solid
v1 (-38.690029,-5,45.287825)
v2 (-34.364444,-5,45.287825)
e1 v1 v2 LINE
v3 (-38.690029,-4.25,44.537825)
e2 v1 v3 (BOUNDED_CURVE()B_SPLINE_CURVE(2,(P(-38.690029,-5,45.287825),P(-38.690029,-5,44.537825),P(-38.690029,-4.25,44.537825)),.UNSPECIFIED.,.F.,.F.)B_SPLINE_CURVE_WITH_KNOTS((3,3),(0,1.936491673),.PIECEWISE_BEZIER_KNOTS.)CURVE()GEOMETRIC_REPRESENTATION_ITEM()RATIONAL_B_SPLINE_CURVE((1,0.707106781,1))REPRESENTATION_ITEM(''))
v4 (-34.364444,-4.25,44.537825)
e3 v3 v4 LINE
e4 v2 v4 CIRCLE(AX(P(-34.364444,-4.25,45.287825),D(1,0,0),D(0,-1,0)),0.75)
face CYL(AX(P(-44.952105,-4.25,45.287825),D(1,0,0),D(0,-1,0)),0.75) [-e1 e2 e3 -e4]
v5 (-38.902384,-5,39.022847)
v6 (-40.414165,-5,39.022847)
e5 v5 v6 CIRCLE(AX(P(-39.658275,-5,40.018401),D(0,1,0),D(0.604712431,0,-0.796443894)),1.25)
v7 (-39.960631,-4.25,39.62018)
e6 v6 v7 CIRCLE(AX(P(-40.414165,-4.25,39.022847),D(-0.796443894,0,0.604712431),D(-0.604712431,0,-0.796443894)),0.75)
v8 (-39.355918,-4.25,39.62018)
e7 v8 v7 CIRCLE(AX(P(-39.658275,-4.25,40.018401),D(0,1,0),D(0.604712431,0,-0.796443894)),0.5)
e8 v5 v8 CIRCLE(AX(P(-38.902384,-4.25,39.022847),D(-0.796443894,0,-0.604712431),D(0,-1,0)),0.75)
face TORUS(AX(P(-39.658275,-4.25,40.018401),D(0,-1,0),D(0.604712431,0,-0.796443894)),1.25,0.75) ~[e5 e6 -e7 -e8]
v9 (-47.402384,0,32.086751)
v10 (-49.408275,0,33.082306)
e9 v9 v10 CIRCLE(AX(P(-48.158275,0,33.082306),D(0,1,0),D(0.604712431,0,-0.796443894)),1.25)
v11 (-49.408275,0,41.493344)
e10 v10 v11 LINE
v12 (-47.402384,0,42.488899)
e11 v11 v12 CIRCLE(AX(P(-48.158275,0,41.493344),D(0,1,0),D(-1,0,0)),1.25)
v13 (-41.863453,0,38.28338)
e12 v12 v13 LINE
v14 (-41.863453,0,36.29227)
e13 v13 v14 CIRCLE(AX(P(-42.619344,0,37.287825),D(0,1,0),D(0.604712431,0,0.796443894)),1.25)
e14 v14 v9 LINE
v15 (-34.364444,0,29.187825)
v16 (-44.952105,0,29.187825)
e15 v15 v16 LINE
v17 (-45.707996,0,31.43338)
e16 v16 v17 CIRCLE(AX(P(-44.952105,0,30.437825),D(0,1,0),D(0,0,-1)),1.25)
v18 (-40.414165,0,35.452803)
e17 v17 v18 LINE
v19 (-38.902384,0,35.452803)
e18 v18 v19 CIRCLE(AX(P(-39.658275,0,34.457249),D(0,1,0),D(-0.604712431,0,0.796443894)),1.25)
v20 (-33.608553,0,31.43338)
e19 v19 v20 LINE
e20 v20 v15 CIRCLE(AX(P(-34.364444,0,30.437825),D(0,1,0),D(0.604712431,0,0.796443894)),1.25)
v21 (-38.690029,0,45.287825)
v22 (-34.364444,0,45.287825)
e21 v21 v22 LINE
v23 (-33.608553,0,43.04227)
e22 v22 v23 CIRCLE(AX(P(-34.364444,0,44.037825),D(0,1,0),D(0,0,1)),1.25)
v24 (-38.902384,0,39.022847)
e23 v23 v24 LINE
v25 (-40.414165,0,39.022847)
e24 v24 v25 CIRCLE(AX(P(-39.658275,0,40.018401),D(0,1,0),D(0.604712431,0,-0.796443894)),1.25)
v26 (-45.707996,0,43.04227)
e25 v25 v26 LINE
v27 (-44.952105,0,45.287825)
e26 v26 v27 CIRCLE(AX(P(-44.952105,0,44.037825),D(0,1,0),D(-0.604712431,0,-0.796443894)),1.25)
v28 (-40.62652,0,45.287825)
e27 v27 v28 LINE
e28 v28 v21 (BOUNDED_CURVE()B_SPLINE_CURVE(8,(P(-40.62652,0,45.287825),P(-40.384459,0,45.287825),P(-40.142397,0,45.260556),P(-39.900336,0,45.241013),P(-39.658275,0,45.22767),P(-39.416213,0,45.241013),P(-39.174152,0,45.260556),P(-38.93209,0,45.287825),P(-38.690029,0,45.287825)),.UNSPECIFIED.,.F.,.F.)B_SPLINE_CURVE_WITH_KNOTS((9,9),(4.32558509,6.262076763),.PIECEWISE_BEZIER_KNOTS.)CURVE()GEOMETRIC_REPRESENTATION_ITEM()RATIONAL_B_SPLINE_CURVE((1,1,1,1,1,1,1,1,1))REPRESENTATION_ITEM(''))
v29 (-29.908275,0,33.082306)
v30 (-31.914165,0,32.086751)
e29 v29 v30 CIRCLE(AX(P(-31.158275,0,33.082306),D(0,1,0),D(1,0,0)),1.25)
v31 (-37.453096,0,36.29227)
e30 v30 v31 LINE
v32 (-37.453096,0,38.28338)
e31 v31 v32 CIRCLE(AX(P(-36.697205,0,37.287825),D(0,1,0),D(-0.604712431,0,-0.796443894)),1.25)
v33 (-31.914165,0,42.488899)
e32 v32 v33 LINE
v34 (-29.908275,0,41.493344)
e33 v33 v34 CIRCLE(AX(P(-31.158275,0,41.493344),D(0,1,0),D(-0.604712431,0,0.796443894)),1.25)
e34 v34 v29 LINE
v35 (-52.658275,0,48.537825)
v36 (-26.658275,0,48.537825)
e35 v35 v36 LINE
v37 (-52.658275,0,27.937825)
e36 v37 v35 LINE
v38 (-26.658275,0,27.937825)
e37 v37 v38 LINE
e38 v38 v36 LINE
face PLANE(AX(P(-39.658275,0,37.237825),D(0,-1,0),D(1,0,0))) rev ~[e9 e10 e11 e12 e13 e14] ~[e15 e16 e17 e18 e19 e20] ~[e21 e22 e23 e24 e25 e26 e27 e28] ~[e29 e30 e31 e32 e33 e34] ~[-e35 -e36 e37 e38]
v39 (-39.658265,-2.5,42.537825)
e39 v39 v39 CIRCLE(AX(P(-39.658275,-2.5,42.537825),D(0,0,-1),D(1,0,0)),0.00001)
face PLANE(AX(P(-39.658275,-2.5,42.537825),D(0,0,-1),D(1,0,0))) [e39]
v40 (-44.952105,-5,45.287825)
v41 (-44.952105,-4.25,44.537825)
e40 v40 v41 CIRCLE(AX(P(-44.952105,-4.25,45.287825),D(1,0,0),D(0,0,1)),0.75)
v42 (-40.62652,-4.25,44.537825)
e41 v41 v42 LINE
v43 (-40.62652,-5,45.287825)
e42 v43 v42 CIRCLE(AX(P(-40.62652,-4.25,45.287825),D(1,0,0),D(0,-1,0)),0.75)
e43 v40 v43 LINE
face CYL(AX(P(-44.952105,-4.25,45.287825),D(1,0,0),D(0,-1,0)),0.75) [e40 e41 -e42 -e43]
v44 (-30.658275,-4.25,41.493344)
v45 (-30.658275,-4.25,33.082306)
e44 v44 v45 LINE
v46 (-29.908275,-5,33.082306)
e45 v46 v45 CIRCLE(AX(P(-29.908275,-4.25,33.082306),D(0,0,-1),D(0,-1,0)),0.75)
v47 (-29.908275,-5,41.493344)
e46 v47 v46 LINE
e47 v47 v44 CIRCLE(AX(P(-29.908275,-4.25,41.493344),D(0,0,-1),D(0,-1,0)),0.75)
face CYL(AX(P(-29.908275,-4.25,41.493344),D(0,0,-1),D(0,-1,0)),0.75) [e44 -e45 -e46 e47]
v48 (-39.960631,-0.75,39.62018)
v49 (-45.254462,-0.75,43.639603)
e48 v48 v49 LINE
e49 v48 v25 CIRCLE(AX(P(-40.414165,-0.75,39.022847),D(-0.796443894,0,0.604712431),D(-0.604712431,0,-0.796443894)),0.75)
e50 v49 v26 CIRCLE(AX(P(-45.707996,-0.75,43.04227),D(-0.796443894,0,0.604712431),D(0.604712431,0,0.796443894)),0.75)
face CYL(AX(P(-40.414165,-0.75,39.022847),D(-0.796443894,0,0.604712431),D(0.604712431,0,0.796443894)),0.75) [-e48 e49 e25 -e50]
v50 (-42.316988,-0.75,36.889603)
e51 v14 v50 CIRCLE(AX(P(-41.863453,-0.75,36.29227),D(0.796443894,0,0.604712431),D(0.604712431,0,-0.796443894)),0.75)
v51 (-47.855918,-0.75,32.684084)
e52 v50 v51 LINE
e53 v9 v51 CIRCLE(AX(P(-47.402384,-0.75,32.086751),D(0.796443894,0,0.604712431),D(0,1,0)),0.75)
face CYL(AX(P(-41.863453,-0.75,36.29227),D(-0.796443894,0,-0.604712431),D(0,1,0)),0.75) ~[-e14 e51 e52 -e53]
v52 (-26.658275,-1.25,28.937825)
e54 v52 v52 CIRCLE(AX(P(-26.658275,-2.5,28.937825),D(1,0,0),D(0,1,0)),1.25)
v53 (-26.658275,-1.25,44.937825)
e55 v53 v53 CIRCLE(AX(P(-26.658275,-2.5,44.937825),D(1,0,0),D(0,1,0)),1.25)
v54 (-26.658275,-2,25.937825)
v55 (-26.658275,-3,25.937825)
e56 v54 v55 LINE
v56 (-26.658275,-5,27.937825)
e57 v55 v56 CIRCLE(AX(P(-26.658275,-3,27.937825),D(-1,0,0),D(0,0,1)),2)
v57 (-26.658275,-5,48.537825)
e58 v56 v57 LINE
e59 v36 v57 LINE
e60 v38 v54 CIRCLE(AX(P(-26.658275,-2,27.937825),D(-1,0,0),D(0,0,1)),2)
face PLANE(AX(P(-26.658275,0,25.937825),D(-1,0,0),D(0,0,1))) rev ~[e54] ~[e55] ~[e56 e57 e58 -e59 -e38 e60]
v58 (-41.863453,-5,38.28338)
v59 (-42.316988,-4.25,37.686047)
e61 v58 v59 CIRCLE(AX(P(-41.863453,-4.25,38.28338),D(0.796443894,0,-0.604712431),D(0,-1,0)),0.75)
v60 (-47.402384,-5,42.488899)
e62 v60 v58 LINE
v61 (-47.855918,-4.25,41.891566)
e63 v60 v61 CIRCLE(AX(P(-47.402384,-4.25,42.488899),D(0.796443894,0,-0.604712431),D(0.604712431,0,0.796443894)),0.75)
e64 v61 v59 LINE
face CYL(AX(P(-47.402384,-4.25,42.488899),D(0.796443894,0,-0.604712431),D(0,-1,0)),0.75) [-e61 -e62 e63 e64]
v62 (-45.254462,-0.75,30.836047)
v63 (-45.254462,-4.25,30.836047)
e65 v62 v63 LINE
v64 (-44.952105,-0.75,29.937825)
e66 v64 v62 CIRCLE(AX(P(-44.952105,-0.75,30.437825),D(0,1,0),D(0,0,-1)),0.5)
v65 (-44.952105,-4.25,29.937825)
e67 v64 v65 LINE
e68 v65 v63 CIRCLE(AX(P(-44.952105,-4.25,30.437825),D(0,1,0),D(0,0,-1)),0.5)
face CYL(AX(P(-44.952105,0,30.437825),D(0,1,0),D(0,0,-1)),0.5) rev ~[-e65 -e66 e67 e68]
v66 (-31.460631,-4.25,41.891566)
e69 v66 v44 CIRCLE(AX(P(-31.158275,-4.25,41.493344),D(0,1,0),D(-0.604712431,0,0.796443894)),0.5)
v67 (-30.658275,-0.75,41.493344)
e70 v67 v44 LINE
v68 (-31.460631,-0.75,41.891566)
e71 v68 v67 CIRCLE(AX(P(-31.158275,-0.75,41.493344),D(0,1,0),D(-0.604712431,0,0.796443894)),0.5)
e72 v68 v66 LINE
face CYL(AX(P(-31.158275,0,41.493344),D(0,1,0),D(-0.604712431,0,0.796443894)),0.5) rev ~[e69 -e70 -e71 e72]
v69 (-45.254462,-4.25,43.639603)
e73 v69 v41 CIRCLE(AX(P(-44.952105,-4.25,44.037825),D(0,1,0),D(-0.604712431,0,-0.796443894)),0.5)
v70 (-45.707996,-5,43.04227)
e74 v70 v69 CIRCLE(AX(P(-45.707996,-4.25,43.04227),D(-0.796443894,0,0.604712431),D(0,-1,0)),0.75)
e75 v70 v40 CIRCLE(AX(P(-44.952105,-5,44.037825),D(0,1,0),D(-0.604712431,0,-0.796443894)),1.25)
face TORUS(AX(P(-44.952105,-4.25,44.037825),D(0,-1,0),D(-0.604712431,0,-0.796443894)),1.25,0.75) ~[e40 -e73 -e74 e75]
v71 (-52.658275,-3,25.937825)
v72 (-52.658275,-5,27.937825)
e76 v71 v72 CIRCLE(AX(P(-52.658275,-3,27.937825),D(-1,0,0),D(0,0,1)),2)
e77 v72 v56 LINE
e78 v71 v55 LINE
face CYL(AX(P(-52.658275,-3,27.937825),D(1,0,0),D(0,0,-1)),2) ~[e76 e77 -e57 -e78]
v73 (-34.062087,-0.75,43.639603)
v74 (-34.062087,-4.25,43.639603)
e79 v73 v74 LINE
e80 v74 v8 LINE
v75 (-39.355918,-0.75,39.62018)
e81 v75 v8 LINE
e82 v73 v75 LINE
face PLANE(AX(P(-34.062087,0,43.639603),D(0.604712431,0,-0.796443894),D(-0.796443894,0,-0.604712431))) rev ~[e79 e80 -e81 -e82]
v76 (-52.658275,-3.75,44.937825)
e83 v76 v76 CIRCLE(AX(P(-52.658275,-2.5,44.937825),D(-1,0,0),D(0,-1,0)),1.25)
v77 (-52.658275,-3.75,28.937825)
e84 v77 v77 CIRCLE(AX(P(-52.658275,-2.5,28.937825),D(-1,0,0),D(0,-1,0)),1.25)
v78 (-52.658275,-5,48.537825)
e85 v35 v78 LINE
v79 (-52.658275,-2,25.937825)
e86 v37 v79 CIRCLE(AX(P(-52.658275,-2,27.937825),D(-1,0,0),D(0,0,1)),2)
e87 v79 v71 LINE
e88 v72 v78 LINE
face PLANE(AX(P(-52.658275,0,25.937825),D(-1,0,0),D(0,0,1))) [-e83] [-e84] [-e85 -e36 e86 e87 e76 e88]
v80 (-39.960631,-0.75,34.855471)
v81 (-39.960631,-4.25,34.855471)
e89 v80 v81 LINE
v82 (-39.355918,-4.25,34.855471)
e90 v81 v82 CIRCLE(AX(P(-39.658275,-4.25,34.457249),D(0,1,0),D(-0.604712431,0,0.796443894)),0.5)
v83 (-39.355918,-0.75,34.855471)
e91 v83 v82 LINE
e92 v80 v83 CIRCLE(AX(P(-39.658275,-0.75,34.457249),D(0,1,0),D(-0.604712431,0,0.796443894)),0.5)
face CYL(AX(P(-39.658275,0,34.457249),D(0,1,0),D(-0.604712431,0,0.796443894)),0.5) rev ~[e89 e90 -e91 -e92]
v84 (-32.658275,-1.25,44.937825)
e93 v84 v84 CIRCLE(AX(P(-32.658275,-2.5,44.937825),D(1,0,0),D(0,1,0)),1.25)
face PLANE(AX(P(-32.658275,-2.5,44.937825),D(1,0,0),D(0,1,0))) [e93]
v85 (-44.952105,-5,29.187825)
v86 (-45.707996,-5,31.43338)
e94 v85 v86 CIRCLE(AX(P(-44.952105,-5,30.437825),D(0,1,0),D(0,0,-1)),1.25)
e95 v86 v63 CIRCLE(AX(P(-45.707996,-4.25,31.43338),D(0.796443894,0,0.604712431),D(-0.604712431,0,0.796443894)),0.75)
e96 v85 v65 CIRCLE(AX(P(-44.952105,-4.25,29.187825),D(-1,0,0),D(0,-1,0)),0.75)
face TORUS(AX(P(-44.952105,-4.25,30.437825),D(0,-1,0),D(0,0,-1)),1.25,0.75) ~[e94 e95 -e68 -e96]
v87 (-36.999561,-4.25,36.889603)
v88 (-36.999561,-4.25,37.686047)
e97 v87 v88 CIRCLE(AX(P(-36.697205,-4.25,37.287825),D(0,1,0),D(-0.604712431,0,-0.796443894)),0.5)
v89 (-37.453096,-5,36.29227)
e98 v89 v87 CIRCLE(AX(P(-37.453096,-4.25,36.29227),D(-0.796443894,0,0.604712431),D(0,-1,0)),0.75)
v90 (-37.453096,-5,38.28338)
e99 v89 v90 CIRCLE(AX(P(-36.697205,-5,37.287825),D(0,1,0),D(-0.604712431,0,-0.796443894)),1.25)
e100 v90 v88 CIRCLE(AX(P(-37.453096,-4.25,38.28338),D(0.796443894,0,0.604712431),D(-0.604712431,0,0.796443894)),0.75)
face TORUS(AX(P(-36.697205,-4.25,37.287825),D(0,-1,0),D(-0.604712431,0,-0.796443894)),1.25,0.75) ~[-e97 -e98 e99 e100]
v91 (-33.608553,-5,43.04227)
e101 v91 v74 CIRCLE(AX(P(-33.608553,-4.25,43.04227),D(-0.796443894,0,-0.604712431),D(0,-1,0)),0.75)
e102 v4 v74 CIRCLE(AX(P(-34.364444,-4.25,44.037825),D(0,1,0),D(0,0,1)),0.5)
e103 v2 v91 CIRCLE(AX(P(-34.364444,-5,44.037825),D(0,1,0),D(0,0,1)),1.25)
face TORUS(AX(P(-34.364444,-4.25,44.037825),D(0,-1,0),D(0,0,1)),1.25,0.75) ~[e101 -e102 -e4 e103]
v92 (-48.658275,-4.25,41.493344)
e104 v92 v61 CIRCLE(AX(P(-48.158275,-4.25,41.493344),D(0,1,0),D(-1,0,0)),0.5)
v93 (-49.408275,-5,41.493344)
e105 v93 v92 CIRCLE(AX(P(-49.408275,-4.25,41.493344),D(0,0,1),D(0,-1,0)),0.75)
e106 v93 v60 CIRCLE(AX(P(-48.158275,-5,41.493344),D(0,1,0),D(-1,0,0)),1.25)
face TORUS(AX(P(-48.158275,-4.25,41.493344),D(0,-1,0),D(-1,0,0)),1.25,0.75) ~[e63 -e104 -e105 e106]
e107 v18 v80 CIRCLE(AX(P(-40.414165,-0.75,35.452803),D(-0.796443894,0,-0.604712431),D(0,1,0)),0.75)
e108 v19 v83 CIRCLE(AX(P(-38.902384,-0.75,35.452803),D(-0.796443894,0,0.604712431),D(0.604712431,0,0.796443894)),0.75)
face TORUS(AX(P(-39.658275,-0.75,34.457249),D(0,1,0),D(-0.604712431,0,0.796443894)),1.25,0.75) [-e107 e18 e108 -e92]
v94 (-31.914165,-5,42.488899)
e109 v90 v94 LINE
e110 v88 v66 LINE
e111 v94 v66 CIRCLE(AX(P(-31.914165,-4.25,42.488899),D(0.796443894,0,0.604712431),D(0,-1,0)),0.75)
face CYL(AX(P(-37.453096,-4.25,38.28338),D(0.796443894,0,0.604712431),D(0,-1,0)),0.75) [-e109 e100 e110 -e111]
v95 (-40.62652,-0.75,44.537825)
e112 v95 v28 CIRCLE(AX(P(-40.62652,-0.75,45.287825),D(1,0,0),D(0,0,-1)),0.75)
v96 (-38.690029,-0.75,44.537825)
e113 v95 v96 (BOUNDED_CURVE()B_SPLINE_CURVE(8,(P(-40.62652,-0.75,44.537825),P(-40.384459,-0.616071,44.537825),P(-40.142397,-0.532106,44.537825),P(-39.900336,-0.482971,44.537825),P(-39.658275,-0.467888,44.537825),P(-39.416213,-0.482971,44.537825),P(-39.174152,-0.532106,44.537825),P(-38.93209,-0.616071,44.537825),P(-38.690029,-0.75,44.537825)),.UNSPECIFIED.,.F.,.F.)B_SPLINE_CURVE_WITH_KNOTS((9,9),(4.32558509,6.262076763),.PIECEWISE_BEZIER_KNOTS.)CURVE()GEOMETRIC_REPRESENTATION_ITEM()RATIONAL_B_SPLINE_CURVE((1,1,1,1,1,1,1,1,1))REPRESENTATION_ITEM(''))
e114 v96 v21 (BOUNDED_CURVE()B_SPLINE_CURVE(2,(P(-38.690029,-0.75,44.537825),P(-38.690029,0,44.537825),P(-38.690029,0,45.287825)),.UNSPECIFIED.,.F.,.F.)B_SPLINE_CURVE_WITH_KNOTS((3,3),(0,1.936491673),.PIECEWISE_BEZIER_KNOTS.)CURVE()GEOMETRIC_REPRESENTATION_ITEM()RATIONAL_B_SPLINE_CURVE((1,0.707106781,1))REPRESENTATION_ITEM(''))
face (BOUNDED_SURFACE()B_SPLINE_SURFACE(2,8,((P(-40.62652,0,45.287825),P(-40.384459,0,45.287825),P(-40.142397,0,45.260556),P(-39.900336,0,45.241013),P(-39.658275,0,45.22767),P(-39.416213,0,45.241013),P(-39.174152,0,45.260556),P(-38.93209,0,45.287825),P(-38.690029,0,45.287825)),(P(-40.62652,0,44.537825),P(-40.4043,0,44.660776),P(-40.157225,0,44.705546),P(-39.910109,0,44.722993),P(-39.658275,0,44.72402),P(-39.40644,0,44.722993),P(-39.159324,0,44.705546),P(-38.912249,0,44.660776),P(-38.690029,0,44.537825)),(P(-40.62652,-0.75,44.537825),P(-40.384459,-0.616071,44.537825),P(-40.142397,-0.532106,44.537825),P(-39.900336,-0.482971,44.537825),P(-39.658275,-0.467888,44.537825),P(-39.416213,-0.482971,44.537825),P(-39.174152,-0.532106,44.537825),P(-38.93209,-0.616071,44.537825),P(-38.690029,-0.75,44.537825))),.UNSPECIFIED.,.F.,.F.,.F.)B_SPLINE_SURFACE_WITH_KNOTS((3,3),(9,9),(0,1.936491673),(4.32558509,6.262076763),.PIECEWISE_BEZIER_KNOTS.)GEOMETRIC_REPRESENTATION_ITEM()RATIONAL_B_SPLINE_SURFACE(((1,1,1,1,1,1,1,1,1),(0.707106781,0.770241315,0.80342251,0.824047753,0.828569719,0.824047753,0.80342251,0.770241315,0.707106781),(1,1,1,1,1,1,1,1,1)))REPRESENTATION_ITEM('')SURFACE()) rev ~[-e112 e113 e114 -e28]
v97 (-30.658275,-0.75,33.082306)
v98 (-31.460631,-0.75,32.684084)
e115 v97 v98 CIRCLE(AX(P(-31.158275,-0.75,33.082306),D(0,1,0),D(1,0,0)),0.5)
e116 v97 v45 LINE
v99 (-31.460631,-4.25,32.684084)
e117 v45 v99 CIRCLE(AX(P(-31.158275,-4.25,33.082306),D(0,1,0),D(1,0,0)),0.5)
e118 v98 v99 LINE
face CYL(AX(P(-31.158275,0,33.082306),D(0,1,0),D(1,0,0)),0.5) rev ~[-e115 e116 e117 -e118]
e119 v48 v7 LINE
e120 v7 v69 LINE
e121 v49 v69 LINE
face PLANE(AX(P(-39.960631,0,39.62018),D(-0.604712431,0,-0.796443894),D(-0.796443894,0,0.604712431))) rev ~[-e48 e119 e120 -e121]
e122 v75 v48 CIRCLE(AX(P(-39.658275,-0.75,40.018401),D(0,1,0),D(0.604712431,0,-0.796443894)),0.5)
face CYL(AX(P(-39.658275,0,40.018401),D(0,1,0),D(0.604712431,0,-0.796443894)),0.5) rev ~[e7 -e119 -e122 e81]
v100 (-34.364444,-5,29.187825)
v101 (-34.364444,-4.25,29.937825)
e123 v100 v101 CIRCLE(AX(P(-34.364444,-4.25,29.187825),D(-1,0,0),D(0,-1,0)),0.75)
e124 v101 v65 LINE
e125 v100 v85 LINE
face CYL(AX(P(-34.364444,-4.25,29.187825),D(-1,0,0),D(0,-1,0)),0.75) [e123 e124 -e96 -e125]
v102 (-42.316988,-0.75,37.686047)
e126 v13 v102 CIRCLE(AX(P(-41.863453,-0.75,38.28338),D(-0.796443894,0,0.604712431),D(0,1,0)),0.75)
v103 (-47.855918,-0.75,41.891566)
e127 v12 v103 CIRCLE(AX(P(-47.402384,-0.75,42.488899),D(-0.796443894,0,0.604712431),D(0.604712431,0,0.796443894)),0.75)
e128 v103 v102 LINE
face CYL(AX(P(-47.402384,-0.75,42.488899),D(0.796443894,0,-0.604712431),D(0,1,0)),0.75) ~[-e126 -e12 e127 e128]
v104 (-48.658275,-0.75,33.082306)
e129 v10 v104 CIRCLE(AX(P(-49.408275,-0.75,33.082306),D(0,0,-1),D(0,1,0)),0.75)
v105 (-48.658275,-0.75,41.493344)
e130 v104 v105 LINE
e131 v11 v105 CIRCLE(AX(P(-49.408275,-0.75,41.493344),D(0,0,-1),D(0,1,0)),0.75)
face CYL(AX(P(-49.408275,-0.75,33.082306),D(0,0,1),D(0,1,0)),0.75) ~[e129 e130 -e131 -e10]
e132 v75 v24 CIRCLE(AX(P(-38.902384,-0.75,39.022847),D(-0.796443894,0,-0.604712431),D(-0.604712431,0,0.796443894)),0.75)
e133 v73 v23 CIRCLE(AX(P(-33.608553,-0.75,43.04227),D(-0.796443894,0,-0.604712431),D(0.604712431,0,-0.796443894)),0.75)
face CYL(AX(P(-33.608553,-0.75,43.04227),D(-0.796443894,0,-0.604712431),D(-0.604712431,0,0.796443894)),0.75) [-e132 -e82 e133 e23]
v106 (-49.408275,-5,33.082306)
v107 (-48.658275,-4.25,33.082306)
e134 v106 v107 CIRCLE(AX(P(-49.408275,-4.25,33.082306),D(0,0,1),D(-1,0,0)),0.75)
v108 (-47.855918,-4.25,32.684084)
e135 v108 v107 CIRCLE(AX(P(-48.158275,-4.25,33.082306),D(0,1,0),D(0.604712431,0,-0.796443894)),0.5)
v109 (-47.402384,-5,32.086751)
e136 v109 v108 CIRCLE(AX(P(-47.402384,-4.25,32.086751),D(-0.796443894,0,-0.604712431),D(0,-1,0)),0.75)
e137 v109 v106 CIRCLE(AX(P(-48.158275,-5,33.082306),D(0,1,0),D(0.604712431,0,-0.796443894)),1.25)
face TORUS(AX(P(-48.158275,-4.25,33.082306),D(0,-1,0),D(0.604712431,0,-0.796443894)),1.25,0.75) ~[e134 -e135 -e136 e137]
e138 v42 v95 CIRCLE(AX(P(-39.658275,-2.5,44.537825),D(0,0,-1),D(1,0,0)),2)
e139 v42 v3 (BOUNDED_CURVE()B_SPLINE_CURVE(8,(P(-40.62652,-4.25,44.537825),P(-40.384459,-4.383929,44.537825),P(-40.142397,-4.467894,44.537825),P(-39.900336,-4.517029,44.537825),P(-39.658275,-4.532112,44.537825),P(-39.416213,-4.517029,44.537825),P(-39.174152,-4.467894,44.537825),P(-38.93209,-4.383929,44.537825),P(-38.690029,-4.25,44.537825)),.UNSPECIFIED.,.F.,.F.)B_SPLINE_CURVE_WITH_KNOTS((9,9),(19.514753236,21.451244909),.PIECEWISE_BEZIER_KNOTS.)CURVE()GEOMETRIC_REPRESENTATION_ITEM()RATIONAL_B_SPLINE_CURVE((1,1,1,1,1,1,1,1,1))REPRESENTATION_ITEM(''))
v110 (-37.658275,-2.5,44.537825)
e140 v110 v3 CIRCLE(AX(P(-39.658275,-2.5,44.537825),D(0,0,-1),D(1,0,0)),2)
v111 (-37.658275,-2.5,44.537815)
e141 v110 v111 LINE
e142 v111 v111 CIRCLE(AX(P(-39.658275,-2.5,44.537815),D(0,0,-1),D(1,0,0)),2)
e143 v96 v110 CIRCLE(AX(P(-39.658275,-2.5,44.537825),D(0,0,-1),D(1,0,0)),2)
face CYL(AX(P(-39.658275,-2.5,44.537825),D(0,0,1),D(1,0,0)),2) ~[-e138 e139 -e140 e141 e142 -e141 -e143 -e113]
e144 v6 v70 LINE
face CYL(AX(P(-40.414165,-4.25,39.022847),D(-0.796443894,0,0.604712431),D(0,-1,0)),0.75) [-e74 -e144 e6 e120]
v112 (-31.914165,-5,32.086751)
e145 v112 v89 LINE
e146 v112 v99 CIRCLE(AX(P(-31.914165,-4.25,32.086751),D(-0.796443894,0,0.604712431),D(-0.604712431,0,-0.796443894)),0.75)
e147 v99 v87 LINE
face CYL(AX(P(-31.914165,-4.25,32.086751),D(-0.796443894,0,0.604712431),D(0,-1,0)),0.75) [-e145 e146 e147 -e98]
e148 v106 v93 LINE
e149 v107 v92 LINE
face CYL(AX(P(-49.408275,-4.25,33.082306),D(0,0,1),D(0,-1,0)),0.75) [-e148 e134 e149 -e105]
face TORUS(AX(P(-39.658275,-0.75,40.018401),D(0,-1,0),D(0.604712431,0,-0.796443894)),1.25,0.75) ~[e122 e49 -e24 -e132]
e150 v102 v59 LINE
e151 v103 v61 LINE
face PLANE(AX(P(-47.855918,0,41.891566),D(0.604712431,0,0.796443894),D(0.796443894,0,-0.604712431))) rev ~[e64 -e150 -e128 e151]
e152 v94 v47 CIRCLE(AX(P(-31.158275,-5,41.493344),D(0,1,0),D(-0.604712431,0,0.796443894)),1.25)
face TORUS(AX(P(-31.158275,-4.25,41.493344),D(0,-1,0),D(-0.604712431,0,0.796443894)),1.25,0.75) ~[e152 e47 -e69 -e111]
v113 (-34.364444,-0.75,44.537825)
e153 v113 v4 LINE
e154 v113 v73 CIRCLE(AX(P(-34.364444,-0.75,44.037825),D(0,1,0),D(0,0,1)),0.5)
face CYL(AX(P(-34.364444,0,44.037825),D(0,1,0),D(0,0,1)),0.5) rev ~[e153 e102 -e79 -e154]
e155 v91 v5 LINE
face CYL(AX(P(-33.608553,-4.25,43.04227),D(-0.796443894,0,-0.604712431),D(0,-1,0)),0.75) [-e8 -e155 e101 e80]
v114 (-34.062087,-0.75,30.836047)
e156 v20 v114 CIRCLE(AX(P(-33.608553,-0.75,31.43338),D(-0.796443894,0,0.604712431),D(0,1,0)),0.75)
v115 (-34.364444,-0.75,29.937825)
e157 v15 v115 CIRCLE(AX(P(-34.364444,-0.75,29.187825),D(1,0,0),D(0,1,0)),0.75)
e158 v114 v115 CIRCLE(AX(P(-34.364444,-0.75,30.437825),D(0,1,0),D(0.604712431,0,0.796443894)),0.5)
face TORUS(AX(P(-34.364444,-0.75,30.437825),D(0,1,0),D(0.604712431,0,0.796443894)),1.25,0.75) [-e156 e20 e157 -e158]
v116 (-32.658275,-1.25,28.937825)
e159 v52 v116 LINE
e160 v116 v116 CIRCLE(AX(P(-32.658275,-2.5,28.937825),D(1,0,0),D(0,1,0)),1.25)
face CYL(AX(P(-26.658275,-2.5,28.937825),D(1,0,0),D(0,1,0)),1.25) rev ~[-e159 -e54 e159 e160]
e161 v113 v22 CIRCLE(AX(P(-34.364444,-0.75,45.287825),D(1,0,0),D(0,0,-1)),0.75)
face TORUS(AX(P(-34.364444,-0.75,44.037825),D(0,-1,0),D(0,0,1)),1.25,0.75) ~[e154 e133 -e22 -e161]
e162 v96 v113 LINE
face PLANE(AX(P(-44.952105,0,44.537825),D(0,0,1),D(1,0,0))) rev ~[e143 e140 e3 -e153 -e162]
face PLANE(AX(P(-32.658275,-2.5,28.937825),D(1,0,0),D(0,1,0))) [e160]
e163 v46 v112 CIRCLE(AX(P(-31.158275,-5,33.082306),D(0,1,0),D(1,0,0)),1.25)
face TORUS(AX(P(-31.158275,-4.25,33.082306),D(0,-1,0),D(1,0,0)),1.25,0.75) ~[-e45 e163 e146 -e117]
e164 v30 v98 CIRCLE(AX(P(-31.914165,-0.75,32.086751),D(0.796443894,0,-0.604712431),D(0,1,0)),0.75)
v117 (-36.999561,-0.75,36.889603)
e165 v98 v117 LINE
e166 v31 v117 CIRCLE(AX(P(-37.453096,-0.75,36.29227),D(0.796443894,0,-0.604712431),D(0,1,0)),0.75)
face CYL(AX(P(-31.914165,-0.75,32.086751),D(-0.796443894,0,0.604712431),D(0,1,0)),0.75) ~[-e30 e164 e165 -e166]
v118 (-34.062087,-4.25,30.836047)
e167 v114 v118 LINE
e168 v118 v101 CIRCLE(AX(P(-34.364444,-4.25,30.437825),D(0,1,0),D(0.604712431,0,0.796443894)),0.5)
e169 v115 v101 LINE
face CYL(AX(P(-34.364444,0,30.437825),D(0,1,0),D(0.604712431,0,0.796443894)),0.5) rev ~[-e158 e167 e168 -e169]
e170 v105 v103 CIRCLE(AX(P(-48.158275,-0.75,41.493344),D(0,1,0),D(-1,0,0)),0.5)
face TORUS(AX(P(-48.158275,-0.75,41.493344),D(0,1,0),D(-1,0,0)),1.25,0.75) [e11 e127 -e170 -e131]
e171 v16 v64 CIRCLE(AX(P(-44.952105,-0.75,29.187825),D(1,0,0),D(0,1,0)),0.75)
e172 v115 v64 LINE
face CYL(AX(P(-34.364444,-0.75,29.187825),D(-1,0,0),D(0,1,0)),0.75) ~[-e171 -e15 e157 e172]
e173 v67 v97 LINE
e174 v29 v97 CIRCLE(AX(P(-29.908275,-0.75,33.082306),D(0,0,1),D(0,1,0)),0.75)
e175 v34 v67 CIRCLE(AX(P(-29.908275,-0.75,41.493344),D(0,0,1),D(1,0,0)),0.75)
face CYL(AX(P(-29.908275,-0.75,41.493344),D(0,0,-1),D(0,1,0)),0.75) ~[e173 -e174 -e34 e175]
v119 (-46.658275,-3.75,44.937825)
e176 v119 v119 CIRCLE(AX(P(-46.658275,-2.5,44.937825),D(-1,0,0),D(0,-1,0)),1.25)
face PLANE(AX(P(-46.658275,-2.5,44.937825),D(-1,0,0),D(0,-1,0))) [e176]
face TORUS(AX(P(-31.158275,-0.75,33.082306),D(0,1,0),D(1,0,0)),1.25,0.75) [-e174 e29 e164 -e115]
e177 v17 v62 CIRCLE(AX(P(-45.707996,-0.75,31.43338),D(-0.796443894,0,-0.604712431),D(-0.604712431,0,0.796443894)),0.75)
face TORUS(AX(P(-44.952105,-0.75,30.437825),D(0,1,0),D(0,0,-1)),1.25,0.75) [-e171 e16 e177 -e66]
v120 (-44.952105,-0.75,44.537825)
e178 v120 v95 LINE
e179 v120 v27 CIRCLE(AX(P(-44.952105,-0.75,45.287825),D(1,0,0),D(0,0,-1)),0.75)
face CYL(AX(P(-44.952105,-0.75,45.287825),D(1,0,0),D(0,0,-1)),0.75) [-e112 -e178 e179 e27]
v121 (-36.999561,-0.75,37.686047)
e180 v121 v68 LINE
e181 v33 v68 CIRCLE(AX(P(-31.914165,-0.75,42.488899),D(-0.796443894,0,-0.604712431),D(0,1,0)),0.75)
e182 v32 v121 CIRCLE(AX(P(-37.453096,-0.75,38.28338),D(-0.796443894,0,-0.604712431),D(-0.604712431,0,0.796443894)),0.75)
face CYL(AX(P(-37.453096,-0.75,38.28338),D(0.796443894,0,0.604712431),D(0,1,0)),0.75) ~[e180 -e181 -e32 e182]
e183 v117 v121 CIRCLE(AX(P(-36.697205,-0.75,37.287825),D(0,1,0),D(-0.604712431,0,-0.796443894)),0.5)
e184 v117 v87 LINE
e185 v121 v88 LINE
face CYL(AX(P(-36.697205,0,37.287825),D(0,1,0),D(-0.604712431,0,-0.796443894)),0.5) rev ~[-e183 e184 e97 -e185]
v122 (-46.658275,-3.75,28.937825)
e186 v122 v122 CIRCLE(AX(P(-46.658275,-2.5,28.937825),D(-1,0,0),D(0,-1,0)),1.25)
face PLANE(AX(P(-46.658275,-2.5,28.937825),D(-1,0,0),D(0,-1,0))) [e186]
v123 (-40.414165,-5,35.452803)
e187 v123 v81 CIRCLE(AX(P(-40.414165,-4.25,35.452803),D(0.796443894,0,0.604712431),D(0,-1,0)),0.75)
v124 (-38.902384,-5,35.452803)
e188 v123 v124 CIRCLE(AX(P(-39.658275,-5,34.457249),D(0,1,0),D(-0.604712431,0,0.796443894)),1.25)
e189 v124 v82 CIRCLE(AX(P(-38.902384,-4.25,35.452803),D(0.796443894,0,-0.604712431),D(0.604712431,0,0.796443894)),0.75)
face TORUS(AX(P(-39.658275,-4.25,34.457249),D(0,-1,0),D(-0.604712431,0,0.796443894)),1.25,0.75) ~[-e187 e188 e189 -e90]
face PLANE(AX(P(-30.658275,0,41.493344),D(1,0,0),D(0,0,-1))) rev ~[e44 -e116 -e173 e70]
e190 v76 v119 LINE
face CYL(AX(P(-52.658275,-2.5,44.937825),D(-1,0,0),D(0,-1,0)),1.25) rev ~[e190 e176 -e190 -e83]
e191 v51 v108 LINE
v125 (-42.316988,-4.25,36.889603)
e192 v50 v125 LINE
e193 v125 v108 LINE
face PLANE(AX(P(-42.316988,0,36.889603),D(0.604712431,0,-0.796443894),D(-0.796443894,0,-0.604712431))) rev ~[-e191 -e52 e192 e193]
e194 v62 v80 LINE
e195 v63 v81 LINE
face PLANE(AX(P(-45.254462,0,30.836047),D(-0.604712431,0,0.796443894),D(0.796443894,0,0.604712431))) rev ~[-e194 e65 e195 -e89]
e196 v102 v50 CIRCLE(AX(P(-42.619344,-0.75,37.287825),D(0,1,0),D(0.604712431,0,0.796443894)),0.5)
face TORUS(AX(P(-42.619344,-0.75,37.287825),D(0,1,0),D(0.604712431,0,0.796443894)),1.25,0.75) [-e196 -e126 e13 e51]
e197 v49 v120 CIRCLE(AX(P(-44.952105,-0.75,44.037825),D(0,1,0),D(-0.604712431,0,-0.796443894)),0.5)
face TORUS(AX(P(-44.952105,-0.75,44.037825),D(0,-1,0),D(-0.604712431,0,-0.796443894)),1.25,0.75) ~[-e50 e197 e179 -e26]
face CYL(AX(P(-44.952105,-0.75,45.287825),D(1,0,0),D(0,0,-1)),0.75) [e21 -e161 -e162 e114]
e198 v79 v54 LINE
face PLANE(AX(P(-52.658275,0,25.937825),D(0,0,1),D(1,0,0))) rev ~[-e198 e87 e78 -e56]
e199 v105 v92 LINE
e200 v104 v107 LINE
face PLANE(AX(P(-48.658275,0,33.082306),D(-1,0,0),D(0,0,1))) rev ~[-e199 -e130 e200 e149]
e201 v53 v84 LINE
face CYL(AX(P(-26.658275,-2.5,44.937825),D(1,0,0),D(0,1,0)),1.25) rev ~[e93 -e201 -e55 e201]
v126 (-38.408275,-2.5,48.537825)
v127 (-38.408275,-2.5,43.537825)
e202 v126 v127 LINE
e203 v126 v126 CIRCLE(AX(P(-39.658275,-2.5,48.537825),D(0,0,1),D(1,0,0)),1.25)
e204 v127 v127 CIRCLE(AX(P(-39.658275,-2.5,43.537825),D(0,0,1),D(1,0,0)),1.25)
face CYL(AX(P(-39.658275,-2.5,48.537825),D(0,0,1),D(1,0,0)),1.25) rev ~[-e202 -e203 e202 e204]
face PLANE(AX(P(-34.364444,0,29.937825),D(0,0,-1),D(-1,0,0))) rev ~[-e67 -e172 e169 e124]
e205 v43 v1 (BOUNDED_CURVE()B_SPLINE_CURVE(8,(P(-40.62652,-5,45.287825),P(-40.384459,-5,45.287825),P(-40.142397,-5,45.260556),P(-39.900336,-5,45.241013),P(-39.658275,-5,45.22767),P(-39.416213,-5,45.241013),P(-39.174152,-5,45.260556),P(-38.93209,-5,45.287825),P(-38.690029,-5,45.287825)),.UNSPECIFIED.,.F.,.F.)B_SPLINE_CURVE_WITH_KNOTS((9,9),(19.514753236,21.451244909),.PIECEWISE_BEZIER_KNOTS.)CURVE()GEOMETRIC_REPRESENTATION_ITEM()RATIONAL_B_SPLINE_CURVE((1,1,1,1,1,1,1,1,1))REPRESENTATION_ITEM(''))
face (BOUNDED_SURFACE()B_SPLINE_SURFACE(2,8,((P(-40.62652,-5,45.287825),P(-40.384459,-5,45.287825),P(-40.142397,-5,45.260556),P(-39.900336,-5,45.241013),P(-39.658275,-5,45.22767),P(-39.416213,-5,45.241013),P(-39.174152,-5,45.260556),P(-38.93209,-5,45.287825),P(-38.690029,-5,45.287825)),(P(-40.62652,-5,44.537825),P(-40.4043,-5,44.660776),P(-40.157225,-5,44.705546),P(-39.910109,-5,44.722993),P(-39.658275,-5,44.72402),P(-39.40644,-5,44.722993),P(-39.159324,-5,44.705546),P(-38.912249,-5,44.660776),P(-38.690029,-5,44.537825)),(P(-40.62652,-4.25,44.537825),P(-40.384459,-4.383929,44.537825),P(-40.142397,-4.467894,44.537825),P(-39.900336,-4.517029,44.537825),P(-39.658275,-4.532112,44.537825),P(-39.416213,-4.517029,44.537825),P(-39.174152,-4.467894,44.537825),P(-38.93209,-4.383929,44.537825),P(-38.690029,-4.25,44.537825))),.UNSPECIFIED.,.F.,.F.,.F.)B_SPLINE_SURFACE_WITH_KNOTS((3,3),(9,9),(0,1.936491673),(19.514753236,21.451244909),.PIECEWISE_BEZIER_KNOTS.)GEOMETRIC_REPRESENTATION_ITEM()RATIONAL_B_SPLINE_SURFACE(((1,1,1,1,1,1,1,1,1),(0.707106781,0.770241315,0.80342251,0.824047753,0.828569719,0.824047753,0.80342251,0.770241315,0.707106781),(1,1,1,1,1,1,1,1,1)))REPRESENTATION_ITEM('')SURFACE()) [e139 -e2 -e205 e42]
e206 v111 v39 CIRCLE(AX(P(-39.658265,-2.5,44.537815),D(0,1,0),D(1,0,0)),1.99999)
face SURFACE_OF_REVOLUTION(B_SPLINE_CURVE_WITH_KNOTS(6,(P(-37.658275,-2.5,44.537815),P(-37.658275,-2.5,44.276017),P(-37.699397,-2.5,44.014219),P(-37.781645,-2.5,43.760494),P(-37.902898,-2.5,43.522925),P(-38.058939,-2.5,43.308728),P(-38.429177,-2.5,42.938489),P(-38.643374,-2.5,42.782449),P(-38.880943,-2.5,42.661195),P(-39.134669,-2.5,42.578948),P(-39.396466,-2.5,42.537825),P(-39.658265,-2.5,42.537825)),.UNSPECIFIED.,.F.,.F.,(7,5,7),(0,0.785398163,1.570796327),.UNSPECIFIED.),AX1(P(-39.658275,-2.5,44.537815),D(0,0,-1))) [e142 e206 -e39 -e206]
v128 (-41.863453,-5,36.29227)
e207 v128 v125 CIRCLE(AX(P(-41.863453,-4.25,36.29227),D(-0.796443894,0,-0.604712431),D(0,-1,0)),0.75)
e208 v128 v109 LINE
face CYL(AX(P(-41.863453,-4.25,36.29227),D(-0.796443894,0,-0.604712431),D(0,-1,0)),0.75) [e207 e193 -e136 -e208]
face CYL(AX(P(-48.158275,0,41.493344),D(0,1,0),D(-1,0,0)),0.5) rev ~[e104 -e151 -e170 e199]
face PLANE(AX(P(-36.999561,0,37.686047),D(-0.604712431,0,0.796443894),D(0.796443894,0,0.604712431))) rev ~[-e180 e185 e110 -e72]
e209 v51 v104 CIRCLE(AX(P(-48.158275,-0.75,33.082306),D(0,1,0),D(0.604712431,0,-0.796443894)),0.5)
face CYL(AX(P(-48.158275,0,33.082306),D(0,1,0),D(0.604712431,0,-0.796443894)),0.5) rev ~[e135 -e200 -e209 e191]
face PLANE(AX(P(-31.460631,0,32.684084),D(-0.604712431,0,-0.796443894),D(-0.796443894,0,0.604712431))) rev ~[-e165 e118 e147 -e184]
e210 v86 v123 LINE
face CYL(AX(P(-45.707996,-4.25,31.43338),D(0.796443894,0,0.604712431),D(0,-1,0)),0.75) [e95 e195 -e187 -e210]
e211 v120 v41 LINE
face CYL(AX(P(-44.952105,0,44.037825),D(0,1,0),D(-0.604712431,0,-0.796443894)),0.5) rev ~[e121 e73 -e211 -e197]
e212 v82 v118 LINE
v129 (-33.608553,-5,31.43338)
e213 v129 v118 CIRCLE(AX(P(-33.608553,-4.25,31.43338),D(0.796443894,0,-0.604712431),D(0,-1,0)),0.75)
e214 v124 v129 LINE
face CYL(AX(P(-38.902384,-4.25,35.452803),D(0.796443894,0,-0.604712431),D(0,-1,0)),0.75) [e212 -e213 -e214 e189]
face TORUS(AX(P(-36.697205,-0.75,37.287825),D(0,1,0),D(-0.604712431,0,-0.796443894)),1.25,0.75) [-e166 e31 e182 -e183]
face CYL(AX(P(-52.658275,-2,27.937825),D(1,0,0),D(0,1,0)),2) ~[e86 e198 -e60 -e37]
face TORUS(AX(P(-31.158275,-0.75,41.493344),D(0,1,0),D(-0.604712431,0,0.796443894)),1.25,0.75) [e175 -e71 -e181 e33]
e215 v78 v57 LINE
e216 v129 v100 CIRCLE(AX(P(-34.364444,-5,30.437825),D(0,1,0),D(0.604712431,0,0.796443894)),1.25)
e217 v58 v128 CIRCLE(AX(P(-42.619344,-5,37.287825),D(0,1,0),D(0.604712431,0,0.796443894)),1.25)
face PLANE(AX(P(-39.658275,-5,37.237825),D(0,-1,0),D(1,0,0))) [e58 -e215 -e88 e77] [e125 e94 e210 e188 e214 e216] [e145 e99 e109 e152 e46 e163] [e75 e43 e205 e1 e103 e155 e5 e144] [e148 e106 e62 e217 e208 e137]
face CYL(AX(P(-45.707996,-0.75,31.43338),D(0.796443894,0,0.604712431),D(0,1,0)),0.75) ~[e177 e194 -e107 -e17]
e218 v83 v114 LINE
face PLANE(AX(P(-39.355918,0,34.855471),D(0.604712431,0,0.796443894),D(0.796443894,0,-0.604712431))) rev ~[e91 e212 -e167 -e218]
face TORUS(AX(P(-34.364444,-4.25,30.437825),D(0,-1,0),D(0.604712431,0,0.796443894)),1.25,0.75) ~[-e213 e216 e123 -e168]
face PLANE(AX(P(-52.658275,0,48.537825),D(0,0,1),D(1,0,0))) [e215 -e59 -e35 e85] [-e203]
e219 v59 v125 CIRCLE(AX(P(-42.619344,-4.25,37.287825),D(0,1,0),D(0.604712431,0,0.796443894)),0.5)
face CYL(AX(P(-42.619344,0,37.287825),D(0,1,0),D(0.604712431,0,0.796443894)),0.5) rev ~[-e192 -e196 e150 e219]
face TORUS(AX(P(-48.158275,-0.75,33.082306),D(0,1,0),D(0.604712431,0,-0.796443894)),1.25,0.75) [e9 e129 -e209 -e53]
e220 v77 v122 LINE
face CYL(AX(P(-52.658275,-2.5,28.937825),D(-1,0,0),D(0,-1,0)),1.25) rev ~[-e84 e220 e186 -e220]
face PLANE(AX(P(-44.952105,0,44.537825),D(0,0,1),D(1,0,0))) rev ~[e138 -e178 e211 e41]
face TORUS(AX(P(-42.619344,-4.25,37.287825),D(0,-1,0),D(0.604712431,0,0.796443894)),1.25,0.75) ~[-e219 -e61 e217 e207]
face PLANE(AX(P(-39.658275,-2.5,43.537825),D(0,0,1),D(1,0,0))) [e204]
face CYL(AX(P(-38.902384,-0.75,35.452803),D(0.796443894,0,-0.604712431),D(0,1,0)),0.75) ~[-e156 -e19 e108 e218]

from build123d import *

# Parameters (mm, degrees)
F0_W     = 26
F0_H     = 22.6
F1_DEPTH = 5
F3_R     = 1.25
F4_DEPTH = 6
F2_R     = 1.25
F5_DEPTH = 6
F6_R     = 2
F7_DEPTH = 2
F8_R     = 1.25
F9_DEPTH = 5
F10_R    = 1.99999
F11_R    = 0.75
F12_R    = 2
F13_R    = 2


# Not quite as in the source:
# - a fillet or chamfer is up to 0.001 mm smaller than in the source, because OpenCascade refuses the exact size


with BuildPart() as f1:
    # F0 (on Front) → F1 (new body)
    with BuildSketch(Plane.XZ):
        with Locations((-39.6582745016, 37.2378250399)):
            Rectangle(F0_W, F0_H)
        with BuildLine():
            ThreePointArc((-34.0620873595, 30.8360469867), (-33.8905707158, 30.2783116759), (-34.364443575, 29.9378250399))
            Line((-34.364443575, 29.9378250399), (-44.9521054281, 29.9378250399))
            ThreePointArc((-44.9521054281, 29.9378250399), (-45.4259782873, 30.2783116759), (-45.2544616436, 30.8360469867))
            Line((-45.2544616436, 30.8360469867), (-39.9606307171, 34.8554705698))
            ThreePointArc((-39.9606307171, 34.8554705698), (-39.6582745016, 34.957248623), (-39.3559182861, 34.8554705698))
            Line((-39.3559182861, 34.8554705698), (-34.0620873595, 30.8360469867))
        make_face(mode=Mode.SUBTRACT)
        with BuildLine():
            ThreePointArc((-47.8559182861, 32.6840836764), (-48.3805602324, 32.6344339297), (-48.6582745016, 33.0823056232))
            Line((-48.6582745016, 33.0823056232), (-48.6582745016, 41.4933444566))
            ThreePointArc((-48.6582745016, 41.4933444566), (-48.3805602324, 41.9412161501), (-47.8559182861, 41.8915664034))
            Line((-47.8559182861, 41.8915664034), (-42.3169875687, 37.6860469867))
            ThreePointArc((-42.3169875687, 37.6860469867), (-42.1193437842, 37.2878250399), (-42.3169875687, 36.889603093))
            Line((-42.3169875687, 36.889603093), (-47.8559182861, 32.6840836764))
        make_face(mode=Mode.SUBTRACT)
        with BuildLine():
            Line((-30.6582745016, 41.4933444566), (-30.6582745016, 33.0823056232))
            ThreePointArc((-30.6582745016, 33.0823056232), (-30.9359887707, 32.6344339297), (-31.4606307171, 32.6840836764))
            Line((-31.4606307171, 32.6840836764), (-36.9995614344, 36.889603093))
            ThreePointArc((-36.9995614344, 36.889603093), (-37.1972052189, 37.2878250399), (-36.9995614344, 37.6860469867))
            Line((-36.9995614344, 37.6860469867), (-31.4606307171, 41.8915664034))
            ThreePointArc((-31.4606307171, 41.8915664034), (-30.9359887707, 41.9412161501), (-30.6582745016, 41.4933444566))
        make_face(mode=Mode.SUBTRACT)
        with BuildLine():
            Line((-44.9521054281, 44.5378250399), (-34.364443575, 44.5378250399))
            ThreePointArc((-34.364443575, 44.5378250399), (-33.8905707158, 44.1973384039), (-34.0620873595, 43.639603093))
            Line((-34.0620873595, 43.639603093), (-39.3559182861, 39.62017951))
            ThreePointArc((-39.3559182861, 39.62017951), (-39.6582745016, 39.5184014568), (-39.9606307171, 39.62017951))
            Line((-39.9606307171, 39.62017951), (-45.2544616436, 43.639603093))
            ThreePointArc((-45.2544616436, 43.639603093), (-45.4259782873, 44.1973384039), (-44.9521054281, 44.5378250399))
        make_face(mode=Mode.SUBTRACT)
    extrude(amount=F1_DEPTH)

    # F3 (on face) → F4 (cut)
    with BuildSketch(Plane(origin=(-52.6582745016, 0, 0), x_dir=(0, -1, 0), z_dir=(-1, 0, 0))):
        with Locations((2.5, 28.9378250399)):
            Circle(F3_R)
        with Locations((2.5, 44.9378250399)):
            Circle(F3_R)
    extrude(amount=-F4_DEPTH, mode=Mode.SUBTRACT)

    # F2 (on face) → F5 (cut)
    with BuildSketch(Plane.YZ.offset(-26.6582745016)):
        with Locations((-2.5, 28.9378250399)):
            Circle(F2_R)
        with Locations((-2.5, 44.9378250399)):
            Circle(F2_R)
    extrude(amount=-F5_DEPTH, mode=Mode.SUBTRACT)

    # F6 (on face) → F7 (join)
    with BuildSketch(Plane(origin=(0, 0, 44.5378250399), x_dir=(1, 0, 0), z_dir=(0, 0, -1))):
        with Locations((-39.6582745016, 2.5)):
            Circle(F6_R)
    extrude(amount=F7_DEPTH)

    # F8 (on face) → F9 (cut)
    with BuildSketch(Plane.XY.offset(48.5378250399)):
        with Locations((-39.6582745016, -2.5)):
            Circle(F8_R)
    extrude(amount=-F9_DEPTH, mode=Mode.SUBTRACT)

    # F10 (radius 2 in the source; OpenCascade refuses exactly that, so slightly less here)
    f10_edges = [f1.edges().sort_by_distance(p)[0] for p in [
        (-41.658275, -2.5, 42.537825),
    ]]
    fillet(f10_edges, radius=F10_R)

    # F11
    f11_edges = [f1.edges().sort_by_distance(p)[0] for p in [
        (-39.658275, 0, 44.537825),
        (-34.230096, 0, 34.786843),
        (-39.658275, 0, 29.937825),
        (-48.658275, 0, 37.287825),
        (-39.658275, -5, 29.937825),
        (-30.658275, -5, 37.287825),
        (-45.086453, -5, 34.786843),
        (-36.709003, -5, 41.629891),
    ]]
    fillet(f11_edges, radius=F11_R)

    # F12
    f12_edges = [f1.edges().sort_by_distance(p)[0] for p in [
        (-39.658275, 0, 25.937825),
    ]]
    fillet(f12_edges, radius=F12_R)

    # F13
    f13_edges = [f1.edges().sort_by_distance(p)[0] for p in [
        (-39.658275, -5, 25.937825),
    ]]
    fillet(f13_edges, radius=F13_R)


solid = f1.part
